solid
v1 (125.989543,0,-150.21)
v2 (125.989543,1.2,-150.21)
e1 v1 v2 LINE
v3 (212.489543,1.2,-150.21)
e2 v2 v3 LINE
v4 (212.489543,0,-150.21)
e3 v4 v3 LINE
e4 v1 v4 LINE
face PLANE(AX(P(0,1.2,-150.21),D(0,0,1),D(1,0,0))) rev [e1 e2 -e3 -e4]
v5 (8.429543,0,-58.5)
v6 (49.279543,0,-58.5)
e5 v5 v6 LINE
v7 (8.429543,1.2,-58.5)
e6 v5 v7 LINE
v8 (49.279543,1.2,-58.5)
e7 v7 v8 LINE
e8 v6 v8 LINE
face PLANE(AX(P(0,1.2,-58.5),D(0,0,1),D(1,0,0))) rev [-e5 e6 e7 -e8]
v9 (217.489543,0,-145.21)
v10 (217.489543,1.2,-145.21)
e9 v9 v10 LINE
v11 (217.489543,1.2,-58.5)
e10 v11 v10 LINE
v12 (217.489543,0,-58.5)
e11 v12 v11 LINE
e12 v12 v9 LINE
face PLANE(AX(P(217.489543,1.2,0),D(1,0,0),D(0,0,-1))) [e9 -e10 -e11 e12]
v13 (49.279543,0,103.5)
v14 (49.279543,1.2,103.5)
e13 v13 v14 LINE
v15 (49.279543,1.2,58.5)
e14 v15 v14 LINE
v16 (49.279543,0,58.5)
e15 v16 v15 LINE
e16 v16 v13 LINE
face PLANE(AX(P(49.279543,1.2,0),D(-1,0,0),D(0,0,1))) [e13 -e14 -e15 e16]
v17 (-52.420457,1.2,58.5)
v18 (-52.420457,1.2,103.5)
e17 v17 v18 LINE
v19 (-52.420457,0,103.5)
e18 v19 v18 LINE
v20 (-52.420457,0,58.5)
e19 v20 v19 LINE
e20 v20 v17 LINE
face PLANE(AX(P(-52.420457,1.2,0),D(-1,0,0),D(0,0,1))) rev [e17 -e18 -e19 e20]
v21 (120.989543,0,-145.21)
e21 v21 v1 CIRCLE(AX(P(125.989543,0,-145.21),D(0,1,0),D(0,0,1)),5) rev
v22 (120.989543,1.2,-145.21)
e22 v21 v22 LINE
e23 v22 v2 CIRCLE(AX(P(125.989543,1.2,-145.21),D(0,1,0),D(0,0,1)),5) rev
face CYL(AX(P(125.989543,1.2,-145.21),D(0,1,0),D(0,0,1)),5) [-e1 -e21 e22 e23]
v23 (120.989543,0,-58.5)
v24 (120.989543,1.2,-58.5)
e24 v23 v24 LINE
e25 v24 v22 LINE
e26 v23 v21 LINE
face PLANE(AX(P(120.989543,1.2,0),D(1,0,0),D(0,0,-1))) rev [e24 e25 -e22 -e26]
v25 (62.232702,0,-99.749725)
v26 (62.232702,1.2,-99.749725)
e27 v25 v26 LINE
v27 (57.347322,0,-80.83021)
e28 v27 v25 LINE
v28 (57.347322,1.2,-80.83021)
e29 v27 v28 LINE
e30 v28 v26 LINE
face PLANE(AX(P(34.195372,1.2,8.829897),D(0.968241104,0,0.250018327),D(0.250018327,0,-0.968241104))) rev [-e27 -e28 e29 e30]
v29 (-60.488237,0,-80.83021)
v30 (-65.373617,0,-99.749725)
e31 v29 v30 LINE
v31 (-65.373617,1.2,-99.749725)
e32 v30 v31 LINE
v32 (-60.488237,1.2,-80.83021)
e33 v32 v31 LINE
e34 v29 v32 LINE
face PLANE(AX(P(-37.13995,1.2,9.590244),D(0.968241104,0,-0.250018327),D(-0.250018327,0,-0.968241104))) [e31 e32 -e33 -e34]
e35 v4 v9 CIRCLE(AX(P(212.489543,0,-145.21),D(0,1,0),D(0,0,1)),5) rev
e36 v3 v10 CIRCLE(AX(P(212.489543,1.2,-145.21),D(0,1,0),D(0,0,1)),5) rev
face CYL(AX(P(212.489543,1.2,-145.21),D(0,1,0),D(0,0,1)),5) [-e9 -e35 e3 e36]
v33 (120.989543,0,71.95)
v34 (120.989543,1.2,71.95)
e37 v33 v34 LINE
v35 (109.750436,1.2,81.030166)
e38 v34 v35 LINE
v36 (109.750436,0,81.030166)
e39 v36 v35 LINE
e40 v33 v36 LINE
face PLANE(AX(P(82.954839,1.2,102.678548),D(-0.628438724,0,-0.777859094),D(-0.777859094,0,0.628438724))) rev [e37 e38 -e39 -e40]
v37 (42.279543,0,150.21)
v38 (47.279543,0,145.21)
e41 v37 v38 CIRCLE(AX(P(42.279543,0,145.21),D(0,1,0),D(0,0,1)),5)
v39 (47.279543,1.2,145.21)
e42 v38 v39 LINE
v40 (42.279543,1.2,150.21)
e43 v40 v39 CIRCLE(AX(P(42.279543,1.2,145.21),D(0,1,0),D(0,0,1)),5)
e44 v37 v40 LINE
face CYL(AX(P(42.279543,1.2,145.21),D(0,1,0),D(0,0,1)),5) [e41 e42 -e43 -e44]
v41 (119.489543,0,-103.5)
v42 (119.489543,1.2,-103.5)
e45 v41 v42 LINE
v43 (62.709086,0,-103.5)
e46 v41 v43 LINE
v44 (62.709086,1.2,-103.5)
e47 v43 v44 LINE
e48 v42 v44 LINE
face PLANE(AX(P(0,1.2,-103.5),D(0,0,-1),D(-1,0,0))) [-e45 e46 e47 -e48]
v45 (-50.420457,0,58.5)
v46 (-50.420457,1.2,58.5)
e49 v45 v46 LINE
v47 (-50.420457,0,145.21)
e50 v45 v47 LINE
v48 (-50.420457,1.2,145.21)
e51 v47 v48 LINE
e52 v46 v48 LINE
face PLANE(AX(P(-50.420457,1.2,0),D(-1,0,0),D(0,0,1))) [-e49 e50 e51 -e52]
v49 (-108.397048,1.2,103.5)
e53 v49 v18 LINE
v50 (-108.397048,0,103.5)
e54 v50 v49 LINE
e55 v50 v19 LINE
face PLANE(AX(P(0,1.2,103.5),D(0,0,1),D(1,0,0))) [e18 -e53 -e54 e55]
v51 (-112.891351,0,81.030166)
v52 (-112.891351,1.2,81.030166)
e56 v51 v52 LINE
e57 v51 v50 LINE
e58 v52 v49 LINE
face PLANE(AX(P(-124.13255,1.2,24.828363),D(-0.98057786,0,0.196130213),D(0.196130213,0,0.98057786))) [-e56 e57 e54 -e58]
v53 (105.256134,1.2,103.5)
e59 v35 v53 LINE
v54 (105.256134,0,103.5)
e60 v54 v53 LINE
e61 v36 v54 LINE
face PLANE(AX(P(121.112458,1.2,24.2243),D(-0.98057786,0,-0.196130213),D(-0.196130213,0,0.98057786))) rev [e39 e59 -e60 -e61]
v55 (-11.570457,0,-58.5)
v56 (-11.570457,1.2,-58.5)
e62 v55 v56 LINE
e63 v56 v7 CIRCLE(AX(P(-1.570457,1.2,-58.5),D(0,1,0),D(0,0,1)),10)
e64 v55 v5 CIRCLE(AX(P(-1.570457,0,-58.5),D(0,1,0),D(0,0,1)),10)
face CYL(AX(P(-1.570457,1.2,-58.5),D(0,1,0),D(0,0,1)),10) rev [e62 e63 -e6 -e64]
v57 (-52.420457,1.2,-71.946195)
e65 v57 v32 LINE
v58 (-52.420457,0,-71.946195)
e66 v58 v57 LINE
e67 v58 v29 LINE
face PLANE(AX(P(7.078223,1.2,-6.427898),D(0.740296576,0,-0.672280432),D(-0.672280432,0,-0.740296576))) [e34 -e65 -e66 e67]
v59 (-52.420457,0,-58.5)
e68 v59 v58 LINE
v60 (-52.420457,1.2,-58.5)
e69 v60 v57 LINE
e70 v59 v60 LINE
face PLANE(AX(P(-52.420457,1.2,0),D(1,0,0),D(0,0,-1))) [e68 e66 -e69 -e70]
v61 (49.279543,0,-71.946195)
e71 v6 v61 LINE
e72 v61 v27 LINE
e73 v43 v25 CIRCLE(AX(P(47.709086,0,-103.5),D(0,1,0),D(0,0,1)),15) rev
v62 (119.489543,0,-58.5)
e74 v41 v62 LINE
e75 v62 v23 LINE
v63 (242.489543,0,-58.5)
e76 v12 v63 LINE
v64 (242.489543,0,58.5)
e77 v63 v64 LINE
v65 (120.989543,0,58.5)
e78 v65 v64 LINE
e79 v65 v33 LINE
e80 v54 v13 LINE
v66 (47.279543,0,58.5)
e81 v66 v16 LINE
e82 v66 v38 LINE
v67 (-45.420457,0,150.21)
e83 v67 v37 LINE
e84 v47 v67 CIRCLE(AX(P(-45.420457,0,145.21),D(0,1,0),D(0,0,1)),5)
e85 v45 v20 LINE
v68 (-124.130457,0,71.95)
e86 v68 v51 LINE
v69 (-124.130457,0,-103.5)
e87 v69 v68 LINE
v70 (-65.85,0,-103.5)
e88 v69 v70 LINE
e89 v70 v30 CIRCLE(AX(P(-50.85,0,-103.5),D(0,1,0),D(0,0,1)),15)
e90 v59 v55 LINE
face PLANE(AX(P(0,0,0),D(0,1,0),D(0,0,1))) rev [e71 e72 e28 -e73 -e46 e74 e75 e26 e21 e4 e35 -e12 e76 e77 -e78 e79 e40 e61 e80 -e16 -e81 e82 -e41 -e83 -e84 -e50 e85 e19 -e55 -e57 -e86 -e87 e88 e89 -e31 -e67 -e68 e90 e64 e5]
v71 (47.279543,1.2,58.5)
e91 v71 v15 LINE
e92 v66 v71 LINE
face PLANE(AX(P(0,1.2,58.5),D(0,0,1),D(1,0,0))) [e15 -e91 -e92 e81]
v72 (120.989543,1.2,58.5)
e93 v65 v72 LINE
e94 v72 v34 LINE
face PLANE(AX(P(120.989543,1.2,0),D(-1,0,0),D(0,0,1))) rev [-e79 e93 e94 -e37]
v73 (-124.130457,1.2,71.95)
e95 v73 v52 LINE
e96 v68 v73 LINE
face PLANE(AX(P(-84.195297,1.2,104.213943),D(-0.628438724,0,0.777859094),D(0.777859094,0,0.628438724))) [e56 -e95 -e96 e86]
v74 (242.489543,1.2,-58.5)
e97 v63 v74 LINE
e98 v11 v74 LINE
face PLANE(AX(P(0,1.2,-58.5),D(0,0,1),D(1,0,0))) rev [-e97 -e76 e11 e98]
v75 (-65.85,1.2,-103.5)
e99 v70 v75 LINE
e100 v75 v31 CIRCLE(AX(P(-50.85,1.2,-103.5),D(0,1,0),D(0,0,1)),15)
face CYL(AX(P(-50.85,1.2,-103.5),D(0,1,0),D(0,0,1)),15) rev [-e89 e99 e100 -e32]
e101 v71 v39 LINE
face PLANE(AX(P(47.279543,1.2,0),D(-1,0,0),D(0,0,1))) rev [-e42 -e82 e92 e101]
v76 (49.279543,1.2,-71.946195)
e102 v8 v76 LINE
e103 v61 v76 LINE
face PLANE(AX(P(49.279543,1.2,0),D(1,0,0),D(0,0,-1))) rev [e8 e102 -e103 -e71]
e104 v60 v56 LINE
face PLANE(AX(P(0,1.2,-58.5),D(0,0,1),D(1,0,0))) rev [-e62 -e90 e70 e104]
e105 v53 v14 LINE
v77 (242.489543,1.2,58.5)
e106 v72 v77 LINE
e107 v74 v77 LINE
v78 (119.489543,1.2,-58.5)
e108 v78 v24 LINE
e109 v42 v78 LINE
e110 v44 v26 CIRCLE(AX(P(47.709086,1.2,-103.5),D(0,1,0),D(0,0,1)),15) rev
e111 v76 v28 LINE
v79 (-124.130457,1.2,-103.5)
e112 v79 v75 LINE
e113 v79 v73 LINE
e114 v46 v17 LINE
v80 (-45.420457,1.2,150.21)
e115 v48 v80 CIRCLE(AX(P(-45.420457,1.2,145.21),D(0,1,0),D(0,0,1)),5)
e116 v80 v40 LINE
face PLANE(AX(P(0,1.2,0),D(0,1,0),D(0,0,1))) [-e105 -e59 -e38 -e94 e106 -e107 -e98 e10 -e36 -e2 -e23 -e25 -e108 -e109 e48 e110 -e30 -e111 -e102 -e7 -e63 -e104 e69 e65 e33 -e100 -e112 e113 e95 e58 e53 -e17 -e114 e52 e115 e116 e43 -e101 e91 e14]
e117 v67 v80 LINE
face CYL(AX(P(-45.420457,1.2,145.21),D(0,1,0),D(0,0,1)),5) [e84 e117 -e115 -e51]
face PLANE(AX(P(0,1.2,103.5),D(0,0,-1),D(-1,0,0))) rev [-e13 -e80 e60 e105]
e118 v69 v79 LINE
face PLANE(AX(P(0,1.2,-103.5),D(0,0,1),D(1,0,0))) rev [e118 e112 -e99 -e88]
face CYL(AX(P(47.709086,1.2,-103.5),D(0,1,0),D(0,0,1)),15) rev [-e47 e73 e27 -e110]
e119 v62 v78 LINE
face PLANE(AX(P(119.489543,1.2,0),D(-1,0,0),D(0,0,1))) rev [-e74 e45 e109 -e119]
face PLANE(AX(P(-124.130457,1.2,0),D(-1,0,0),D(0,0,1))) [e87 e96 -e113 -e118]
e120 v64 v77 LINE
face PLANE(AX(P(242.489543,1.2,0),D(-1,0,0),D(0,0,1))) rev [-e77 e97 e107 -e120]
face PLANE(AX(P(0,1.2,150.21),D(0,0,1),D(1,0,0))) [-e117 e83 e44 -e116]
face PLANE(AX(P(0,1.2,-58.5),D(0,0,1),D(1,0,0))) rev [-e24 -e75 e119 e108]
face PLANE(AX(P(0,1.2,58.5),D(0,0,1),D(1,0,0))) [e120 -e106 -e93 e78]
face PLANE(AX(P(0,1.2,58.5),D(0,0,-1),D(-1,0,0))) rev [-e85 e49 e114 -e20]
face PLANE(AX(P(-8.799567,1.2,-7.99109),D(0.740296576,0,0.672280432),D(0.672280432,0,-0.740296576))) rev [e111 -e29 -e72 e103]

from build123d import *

# Parameters (mm, degrees)
BOSS_EXTRUDE1_DEPTH = 1.2


with BuildPart() as part:
    # Sketch1 → Boss-Extrude1 (new body)
    with BuildSketch(Plane(origin=(0, 0, 0), x_dir=(1, 0, 0), z_dir=(0, 1, 0))):
        with BuildLine():
            Line((-52.420457213, 58.5), (-52.420457213, 71.946194901))
            Line((-52.420457213, 71.946194901), (-60.488236819, 80.830210159))
            Line((-60.488236819, 80.830210159), (-65.373616564, 99.749725089))
            ThreePointArc((-65.373616564, 99.749725089), (-65.730427555, 101.60979478), (-65.85, 103.5))
            Line((-65.85, 103.5), (-124.130457213, 103.5))
            Line((-124.130457213, 103.5), (-124.130457213, -71.95))
            Line((-124.130457213, -71.95), (-112.891350531, -81.0301662))
            Line((-112.891350531, -81.0301662), (-108.397048281, -103.5))
            Line((-108.397048281, -103.5), (-52.420457213, -103.5))
            Line((-52.420457213, -103.5), (-52.420457213, -58.5))
            Line((-52.420457213, -58.5), (-50.420457213, -58.5))
            Line((-50.420457213, -58.5), (-50.420457213, -145.21))
            ThreePointArc((-50.420457213, -145.21), (-48.955991119, -148.745533906), (-45.420457213, -150.21))
            Line((-45.420457213, -150.21), (42.279542787, -150.21))
            ThreePointArc((42.279542787, -150.21), (45.815076693, -148.745533906), (47.279542787, -145.21))
            Line((47.279542787, -145.21), (47.279542787, -58.5))
            Line((47.279542787, -58.5), (49.279542787, -58.5))
            Line((49.279542787, -58.5), (49.279542787, -103.5))
            Line((49.279542787, -103.5), (105.256133855, -103.5))
            Line((105.256133855, -103.5), (109.750436105, -81.0301662))
            Line((109.750436105, -81.0301662), (120.989542787, -71.95))
            Line((120.989542787, -71.95), (120.989542787, -58.5))
            Line((120.989542787, -58.5), (242.489542787, -58.5))
            Line((242.489542787, -58.5), (242.489542787, 58.5))
            Line((242.489542787, 58.5), (217.489542787, 58.5))
            Line((217.489542787, 58.5), (217.489542787, 145.21))
            ThreePointArc((217.489542787, 145.21), (216.025076693, 148.745533906), (212.489542787, 150.21))
            Line((212.489542787, 150.21), (125.989542787, 150.21))
            ThreePointArc((125.989542787, 150.21), (122.454008881, 148.745533906), (120.989542787, 145.21))
            Line((120.989542787, 145.21), (120.989542787, 58.5))
            Line((120.989542787, 58.5), (119.489542787, 58.5))
            Line((119.489542787, 58.5), (119.489542787, 103.5))
            Line((119.489542787, 103.5), (62.709085574, 103.5))
            ThreePointArc((62.709085574, 103.5), (62.589513129, 101.60979478), (62.232702138, 99.749725089))
            Line((62.232702138, 99.749725089), (57.347322393, 80.830210159))
            Line((57.347322393, 80.830210159), (49.279542787, 71.946194901))
            Line((49.279542787, 71.946194901), (49.279542787, 58.5))
            Line((49.279542787, 58.5), (8.429542787, 58.5))
            ThreePointArc((8.429542787, 58.5), (-1.570457213, 48.5), (-11.570457213, 58.5))
            Line((-11.570457213, 58.5), (-52.420457213, 58.5))
        make_face()
    extrude(amount=BOSS_EXTRUDE1_DEPTH)


solid = part.part
